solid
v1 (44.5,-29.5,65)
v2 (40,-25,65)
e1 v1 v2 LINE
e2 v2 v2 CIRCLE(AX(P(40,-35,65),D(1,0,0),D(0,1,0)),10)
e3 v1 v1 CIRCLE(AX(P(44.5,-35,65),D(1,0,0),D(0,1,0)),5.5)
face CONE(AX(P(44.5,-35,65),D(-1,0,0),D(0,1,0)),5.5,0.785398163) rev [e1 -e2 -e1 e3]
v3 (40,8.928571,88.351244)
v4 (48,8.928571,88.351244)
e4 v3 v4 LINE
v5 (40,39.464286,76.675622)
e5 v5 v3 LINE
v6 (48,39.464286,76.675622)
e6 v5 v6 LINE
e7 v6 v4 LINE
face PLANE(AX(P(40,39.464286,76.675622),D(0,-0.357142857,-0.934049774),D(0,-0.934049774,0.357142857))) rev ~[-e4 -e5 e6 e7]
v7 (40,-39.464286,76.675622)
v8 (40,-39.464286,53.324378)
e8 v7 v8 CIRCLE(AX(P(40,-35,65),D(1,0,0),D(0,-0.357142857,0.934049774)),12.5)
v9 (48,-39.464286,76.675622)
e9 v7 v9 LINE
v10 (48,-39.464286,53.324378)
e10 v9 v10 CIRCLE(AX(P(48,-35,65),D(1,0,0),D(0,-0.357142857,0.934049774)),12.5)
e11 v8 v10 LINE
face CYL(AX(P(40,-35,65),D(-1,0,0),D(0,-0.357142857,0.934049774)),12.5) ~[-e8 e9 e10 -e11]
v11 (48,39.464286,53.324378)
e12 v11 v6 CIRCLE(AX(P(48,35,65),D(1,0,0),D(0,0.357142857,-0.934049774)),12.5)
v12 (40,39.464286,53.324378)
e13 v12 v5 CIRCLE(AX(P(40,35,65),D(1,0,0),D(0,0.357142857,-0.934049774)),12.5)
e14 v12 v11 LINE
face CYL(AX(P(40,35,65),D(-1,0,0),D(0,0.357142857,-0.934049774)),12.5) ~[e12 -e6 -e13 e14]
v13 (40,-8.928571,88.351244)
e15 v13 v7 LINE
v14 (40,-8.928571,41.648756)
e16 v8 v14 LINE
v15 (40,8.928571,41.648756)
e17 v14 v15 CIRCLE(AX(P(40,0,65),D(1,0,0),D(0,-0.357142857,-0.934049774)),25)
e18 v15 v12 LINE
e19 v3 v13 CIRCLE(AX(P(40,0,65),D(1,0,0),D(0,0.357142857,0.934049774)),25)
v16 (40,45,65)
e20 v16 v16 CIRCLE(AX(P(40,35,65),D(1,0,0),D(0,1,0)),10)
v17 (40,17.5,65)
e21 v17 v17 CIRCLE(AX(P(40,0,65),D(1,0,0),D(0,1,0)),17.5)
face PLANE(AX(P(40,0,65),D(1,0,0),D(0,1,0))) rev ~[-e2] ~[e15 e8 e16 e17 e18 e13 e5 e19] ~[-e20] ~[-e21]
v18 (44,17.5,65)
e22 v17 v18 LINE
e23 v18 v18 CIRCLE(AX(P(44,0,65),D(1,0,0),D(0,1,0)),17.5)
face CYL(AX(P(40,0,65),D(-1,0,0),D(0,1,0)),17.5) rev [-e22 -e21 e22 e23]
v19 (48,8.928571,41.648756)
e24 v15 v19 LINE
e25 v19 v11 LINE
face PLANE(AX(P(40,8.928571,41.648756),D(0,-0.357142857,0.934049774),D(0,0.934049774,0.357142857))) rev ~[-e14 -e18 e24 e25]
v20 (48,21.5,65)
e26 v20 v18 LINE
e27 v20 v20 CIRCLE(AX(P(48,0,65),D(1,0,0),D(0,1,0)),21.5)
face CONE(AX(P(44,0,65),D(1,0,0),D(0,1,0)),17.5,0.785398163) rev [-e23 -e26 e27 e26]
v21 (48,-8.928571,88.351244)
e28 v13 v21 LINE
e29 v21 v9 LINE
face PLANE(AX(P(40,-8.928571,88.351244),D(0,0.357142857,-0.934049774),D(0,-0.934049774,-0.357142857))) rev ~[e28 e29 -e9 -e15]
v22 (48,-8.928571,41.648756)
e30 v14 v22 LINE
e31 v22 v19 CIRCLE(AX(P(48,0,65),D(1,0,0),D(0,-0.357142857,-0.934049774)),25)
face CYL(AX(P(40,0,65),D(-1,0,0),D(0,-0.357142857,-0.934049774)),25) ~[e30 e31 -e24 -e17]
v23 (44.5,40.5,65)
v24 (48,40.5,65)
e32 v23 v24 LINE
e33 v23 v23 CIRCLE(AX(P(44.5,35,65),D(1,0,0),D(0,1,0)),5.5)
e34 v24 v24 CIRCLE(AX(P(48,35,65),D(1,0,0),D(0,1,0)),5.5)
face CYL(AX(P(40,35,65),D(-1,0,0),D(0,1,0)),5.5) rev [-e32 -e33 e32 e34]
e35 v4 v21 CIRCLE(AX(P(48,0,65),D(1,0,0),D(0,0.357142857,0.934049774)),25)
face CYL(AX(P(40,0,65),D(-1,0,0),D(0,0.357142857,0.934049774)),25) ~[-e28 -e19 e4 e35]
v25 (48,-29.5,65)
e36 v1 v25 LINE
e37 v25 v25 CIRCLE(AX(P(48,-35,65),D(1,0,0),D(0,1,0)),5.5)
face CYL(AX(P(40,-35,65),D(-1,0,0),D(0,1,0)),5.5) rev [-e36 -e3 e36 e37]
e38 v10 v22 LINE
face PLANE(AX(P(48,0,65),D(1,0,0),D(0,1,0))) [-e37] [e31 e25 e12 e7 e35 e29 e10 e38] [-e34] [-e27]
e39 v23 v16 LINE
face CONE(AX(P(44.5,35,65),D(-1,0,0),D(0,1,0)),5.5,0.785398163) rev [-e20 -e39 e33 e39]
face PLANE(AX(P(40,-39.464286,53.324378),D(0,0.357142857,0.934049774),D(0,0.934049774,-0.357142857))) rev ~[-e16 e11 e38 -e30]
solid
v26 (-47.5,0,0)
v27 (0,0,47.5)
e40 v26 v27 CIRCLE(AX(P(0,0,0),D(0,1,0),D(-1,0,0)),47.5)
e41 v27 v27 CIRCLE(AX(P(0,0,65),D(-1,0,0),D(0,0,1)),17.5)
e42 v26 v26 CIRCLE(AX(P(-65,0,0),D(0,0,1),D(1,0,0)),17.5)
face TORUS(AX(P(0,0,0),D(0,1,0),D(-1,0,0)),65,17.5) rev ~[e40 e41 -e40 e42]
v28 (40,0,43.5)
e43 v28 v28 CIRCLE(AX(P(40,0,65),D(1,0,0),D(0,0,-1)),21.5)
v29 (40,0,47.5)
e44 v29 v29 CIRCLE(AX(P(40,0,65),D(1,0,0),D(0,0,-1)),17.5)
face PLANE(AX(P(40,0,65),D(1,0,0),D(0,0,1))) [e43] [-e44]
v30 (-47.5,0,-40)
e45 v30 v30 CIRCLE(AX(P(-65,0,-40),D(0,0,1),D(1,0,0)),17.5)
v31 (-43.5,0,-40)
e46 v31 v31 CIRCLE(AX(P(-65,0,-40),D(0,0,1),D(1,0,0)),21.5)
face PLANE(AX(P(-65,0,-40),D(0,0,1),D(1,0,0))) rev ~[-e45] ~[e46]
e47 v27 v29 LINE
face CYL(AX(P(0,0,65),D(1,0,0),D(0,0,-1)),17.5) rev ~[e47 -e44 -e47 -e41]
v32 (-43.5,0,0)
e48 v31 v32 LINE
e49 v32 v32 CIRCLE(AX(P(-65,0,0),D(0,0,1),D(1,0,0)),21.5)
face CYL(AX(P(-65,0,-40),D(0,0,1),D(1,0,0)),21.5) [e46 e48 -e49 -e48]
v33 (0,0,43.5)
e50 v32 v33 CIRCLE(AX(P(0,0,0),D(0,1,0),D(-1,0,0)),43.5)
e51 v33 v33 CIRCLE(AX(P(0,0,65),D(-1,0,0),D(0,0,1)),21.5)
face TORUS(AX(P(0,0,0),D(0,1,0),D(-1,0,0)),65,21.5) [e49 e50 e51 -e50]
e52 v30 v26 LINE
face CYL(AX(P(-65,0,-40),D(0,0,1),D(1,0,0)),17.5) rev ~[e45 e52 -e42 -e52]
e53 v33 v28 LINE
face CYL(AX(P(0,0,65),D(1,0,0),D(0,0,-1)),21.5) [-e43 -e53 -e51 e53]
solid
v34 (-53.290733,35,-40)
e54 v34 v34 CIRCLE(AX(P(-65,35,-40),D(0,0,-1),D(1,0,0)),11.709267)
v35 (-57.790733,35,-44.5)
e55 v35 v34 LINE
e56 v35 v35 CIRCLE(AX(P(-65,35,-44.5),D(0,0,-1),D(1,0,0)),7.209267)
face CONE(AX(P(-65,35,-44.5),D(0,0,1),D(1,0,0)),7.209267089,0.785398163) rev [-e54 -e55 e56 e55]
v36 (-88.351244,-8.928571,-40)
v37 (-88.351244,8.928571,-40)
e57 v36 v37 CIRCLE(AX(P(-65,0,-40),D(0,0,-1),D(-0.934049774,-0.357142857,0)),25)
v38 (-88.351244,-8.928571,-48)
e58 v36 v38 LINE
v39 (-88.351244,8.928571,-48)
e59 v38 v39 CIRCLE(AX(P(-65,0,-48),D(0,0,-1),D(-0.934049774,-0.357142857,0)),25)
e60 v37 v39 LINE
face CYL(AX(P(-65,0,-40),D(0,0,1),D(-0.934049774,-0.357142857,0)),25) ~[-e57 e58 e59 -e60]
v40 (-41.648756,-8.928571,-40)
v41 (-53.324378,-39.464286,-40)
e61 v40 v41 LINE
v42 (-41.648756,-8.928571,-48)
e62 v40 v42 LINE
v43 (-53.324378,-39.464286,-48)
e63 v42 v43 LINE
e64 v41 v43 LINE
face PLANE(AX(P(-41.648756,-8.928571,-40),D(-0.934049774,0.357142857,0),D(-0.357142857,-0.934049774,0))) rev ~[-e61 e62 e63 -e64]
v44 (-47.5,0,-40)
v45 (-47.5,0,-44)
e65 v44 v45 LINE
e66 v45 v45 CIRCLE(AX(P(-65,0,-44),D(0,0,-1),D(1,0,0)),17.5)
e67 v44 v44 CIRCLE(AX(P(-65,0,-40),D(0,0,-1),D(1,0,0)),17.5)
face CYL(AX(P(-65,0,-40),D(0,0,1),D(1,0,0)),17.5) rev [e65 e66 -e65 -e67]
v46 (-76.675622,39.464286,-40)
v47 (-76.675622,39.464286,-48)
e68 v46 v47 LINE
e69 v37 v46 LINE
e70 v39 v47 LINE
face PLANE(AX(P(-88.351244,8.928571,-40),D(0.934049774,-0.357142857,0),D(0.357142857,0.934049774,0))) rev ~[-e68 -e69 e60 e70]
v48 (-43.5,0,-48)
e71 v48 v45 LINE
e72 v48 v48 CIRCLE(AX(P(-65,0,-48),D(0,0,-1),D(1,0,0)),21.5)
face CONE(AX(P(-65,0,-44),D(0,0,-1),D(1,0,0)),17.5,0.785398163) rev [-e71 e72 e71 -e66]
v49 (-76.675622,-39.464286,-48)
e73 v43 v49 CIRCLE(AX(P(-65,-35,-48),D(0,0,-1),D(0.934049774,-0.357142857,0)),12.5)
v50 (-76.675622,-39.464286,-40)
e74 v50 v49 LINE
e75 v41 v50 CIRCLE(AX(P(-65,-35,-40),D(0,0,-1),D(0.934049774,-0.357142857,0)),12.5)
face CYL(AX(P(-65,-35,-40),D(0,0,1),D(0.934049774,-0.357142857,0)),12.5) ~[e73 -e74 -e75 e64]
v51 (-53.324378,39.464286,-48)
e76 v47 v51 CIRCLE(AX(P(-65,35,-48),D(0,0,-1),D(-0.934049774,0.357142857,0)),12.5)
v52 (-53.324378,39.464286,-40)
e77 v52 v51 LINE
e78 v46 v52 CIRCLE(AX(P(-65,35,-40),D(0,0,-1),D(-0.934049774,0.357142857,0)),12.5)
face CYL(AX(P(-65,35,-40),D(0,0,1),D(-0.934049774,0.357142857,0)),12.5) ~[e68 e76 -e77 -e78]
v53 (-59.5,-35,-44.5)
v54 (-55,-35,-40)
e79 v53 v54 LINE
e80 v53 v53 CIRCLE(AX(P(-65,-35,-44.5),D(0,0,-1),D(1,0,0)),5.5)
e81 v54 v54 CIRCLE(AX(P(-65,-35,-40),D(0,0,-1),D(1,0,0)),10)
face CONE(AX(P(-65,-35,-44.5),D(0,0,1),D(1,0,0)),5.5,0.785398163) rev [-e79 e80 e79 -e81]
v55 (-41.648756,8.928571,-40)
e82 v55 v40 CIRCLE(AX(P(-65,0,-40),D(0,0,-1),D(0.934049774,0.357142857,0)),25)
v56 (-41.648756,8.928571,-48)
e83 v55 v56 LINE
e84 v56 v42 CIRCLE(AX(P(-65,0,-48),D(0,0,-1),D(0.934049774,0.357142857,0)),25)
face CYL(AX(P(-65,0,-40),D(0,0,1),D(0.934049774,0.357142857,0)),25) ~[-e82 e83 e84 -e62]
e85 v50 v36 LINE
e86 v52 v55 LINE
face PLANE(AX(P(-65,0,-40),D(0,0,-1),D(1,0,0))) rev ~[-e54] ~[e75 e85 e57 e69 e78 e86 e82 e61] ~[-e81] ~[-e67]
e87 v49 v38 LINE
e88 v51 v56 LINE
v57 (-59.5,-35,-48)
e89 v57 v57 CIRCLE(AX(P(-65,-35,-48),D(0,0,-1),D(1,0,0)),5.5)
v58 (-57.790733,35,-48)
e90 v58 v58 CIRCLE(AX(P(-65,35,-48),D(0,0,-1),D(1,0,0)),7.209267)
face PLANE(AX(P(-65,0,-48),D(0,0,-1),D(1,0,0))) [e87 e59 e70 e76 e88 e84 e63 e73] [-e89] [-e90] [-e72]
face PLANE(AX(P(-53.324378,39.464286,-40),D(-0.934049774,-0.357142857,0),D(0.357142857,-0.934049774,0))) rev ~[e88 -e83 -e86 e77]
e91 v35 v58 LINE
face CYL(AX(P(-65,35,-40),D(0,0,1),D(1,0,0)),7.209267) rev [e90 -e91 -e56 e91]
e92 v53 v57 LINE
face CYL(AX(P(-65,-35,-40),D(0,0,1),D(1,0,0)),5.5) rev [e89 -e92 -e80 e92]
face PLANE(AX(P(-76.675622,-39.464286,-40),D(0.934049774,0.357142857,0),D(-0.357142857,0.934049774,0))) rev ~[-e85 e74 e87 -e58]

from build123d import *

# Parameters (mm, degrees)
F1_R      = 21.5
F1_R_2    = 17.5
F3_R      = 7.2092670895
F3_R_2    = 21.5
F3_R_3    = 5.5
F3_R_4    = 17.5
F4_DEPTH  = 8
F5_R      = 5.5
F5_R_2    = 21.5
F5_R_3    = 17.5
F6_DEPTH  = 8
F7_SIZE   = 4.5
F7_2_SIZE = 4.5
F8_SIZE   = 4
F8_2_SIZE = 4


with BuildPart() as f2:
    # F2: sweep along a path in F0
    with BuildLine(Plane.XZ) as f2_path:
        Line((-65, -40), (-65, 0))
        ThreePointArc((-65, 0), (-45.9619407771, 45.9619407771), (0, 65))
        Line((0, 65), (40, 65))
    # F1 (on Top) → F2 (sweep)
    with BuildSketch(Plane.XY):
        with Locations((-65, 0)):
            Circle(F1_R)
        with Locations((-65, 0)):
            Circle(F1_R_2, mode=Mode.SUBTRACT)
    sweep(path=f2_path.line)


with BuildPart() as f4:
    # F3 (on face) → F4 (new body)
    with BuildSketch(Plane(origin=(0, 0, -40), x_dir=(1, 0, 0), z_dir=(0, 0, -1))):
        with BuildLine():
            Line((-76.6756221702, 39.4642857143), (-88.3512443404, 8.9285714286))
            ThreePointArc((-88.3512443404, 8.9285714286), (-90, 0), (-88.3512443404, -8.9285714286))
            Line((-88.3512443404, -8.9285714286), (-76.6756221702, -39.4642857143))
            ThreePointArc((-76.6756221702, -39.4642857143), (-65, -47.5), (-53.3243778298, -39.4642857143))
            Line((-53.3243778298, -39.4642857143), (-41.6487556596, -8.9285714286))
            ThreePointArc((-41.6487556596, -8.9285714286), (-40, 0), (-41.6487556596, 8.9285714286))
            Line((-41.6487556596, 8.9285714286), (-53.3243778298, 39.4642857143))
            ThreePointArc((-53.3243778298, 39.4642857143), (-65, 47.5), (-76.6756221702, 39.4642857143))
        make_face()
        with Locations((-65, -35)):
            Circle(F3_R, mode=Mode.SUBTRACT)
        with Locations((-65, 0)):
            Circle(F3_R_2, mode=Mode.SUBTRACT)
        with Locations((-65, 35)):
            Circle(F3_R_3, mode=Mode.SUBTRACT)
        with Locations((-65, 0)):
            Circle(F3_R_2)
        with Locations((-65, 0)):
            Circle(F3_R_4, mode=Mode.SUBTRACT)
    extrude(amount=F4_DEPTH)

    # F7
    f7_edges = [f4.edges().sort_by_distance(p)[0] for p in [
        (-72.209267, 35, -40),
        (-70.5, -35, -40),
    ]]
    chamfer(f7_edges, length=F7_SIZE)

    # F8
    f8_edges = [f4.edges().sort_by_distance(p)[0] for p in [
        (-82.5, 0, -48),
    ]]
    chamfer(f8_edges, length=F8_SIZE)


with BuildPart() as f6:
    # F5 (on face) → F6 (new body)
    with BuildSketch(Plane.YZ.offset(40)):
        with BuildLine():
            Line((39.4642857143, 76.6756221702), (8.9285714286, 88.3512443404))
            ThreePointArc((8.9285714286, 88.3512443404), (0, 90), (-8.9285714286, 88.3512443404))
            Line((-8.9285714286, 88.3512443404), (-39.4642857143, 76.6756221702))
            ThreePointArc((-39.4642857143, 76.6756221702), (-47.5, 65), (-39.4642857143, 53.3243778298))
            Line((-39.4642857143, 53.3243778298), (-8.9285714286, 41.6487556596))
            ThreePointArc((-8.9285714286, 41.6487556596), (0, 40), (8.9285714286, 41.6487556596))
            Line((8.9285714286, 41.6487556596), (39.4642857143, 53.3243778298))
            ThreePointArc((39.4642857143, 53.3243778298), (47.5, 65), (39.4642857143, 76.6756221702))
        make_face()
        with Locations((-35, 65)):
            Circle(F5_R, mode=Mode.SUBTRACT)
        with Locations((0, 65)):
            Circle(F5_R_2, mode=Mode.SUBTRACT)
        with Locations((35, 65)):
            Circle(F5_R, mode=Mode.SUBTRACT)
        with Locations((0, 65)):
            Circle(F5_R_2)
        with Locations((0, 65)):
            Circle(F5_R_3, mode=Mode.SUBTRACT)
    extrude(amount=F6_DEPTH)

    # F7#2
    f7_2_edges = [f6.edges().sort_by_distance(p)[0] for p in [
        (40, 29.5, 65),
        (40, -40.5, 65),
    ]]
    chamfer(f7_2_edges, length=F7_2_SIZE)

    # F8#2
    f8_2_edges = [f6.edges().sort_by_distance(p)[0] for p in [
        (48, -17.5, 65),
    ]]
    chamfer(f8_2_edges, length=F8_2_SIZE)


solid = Compound([f2.part, f4.part, f6.part])
